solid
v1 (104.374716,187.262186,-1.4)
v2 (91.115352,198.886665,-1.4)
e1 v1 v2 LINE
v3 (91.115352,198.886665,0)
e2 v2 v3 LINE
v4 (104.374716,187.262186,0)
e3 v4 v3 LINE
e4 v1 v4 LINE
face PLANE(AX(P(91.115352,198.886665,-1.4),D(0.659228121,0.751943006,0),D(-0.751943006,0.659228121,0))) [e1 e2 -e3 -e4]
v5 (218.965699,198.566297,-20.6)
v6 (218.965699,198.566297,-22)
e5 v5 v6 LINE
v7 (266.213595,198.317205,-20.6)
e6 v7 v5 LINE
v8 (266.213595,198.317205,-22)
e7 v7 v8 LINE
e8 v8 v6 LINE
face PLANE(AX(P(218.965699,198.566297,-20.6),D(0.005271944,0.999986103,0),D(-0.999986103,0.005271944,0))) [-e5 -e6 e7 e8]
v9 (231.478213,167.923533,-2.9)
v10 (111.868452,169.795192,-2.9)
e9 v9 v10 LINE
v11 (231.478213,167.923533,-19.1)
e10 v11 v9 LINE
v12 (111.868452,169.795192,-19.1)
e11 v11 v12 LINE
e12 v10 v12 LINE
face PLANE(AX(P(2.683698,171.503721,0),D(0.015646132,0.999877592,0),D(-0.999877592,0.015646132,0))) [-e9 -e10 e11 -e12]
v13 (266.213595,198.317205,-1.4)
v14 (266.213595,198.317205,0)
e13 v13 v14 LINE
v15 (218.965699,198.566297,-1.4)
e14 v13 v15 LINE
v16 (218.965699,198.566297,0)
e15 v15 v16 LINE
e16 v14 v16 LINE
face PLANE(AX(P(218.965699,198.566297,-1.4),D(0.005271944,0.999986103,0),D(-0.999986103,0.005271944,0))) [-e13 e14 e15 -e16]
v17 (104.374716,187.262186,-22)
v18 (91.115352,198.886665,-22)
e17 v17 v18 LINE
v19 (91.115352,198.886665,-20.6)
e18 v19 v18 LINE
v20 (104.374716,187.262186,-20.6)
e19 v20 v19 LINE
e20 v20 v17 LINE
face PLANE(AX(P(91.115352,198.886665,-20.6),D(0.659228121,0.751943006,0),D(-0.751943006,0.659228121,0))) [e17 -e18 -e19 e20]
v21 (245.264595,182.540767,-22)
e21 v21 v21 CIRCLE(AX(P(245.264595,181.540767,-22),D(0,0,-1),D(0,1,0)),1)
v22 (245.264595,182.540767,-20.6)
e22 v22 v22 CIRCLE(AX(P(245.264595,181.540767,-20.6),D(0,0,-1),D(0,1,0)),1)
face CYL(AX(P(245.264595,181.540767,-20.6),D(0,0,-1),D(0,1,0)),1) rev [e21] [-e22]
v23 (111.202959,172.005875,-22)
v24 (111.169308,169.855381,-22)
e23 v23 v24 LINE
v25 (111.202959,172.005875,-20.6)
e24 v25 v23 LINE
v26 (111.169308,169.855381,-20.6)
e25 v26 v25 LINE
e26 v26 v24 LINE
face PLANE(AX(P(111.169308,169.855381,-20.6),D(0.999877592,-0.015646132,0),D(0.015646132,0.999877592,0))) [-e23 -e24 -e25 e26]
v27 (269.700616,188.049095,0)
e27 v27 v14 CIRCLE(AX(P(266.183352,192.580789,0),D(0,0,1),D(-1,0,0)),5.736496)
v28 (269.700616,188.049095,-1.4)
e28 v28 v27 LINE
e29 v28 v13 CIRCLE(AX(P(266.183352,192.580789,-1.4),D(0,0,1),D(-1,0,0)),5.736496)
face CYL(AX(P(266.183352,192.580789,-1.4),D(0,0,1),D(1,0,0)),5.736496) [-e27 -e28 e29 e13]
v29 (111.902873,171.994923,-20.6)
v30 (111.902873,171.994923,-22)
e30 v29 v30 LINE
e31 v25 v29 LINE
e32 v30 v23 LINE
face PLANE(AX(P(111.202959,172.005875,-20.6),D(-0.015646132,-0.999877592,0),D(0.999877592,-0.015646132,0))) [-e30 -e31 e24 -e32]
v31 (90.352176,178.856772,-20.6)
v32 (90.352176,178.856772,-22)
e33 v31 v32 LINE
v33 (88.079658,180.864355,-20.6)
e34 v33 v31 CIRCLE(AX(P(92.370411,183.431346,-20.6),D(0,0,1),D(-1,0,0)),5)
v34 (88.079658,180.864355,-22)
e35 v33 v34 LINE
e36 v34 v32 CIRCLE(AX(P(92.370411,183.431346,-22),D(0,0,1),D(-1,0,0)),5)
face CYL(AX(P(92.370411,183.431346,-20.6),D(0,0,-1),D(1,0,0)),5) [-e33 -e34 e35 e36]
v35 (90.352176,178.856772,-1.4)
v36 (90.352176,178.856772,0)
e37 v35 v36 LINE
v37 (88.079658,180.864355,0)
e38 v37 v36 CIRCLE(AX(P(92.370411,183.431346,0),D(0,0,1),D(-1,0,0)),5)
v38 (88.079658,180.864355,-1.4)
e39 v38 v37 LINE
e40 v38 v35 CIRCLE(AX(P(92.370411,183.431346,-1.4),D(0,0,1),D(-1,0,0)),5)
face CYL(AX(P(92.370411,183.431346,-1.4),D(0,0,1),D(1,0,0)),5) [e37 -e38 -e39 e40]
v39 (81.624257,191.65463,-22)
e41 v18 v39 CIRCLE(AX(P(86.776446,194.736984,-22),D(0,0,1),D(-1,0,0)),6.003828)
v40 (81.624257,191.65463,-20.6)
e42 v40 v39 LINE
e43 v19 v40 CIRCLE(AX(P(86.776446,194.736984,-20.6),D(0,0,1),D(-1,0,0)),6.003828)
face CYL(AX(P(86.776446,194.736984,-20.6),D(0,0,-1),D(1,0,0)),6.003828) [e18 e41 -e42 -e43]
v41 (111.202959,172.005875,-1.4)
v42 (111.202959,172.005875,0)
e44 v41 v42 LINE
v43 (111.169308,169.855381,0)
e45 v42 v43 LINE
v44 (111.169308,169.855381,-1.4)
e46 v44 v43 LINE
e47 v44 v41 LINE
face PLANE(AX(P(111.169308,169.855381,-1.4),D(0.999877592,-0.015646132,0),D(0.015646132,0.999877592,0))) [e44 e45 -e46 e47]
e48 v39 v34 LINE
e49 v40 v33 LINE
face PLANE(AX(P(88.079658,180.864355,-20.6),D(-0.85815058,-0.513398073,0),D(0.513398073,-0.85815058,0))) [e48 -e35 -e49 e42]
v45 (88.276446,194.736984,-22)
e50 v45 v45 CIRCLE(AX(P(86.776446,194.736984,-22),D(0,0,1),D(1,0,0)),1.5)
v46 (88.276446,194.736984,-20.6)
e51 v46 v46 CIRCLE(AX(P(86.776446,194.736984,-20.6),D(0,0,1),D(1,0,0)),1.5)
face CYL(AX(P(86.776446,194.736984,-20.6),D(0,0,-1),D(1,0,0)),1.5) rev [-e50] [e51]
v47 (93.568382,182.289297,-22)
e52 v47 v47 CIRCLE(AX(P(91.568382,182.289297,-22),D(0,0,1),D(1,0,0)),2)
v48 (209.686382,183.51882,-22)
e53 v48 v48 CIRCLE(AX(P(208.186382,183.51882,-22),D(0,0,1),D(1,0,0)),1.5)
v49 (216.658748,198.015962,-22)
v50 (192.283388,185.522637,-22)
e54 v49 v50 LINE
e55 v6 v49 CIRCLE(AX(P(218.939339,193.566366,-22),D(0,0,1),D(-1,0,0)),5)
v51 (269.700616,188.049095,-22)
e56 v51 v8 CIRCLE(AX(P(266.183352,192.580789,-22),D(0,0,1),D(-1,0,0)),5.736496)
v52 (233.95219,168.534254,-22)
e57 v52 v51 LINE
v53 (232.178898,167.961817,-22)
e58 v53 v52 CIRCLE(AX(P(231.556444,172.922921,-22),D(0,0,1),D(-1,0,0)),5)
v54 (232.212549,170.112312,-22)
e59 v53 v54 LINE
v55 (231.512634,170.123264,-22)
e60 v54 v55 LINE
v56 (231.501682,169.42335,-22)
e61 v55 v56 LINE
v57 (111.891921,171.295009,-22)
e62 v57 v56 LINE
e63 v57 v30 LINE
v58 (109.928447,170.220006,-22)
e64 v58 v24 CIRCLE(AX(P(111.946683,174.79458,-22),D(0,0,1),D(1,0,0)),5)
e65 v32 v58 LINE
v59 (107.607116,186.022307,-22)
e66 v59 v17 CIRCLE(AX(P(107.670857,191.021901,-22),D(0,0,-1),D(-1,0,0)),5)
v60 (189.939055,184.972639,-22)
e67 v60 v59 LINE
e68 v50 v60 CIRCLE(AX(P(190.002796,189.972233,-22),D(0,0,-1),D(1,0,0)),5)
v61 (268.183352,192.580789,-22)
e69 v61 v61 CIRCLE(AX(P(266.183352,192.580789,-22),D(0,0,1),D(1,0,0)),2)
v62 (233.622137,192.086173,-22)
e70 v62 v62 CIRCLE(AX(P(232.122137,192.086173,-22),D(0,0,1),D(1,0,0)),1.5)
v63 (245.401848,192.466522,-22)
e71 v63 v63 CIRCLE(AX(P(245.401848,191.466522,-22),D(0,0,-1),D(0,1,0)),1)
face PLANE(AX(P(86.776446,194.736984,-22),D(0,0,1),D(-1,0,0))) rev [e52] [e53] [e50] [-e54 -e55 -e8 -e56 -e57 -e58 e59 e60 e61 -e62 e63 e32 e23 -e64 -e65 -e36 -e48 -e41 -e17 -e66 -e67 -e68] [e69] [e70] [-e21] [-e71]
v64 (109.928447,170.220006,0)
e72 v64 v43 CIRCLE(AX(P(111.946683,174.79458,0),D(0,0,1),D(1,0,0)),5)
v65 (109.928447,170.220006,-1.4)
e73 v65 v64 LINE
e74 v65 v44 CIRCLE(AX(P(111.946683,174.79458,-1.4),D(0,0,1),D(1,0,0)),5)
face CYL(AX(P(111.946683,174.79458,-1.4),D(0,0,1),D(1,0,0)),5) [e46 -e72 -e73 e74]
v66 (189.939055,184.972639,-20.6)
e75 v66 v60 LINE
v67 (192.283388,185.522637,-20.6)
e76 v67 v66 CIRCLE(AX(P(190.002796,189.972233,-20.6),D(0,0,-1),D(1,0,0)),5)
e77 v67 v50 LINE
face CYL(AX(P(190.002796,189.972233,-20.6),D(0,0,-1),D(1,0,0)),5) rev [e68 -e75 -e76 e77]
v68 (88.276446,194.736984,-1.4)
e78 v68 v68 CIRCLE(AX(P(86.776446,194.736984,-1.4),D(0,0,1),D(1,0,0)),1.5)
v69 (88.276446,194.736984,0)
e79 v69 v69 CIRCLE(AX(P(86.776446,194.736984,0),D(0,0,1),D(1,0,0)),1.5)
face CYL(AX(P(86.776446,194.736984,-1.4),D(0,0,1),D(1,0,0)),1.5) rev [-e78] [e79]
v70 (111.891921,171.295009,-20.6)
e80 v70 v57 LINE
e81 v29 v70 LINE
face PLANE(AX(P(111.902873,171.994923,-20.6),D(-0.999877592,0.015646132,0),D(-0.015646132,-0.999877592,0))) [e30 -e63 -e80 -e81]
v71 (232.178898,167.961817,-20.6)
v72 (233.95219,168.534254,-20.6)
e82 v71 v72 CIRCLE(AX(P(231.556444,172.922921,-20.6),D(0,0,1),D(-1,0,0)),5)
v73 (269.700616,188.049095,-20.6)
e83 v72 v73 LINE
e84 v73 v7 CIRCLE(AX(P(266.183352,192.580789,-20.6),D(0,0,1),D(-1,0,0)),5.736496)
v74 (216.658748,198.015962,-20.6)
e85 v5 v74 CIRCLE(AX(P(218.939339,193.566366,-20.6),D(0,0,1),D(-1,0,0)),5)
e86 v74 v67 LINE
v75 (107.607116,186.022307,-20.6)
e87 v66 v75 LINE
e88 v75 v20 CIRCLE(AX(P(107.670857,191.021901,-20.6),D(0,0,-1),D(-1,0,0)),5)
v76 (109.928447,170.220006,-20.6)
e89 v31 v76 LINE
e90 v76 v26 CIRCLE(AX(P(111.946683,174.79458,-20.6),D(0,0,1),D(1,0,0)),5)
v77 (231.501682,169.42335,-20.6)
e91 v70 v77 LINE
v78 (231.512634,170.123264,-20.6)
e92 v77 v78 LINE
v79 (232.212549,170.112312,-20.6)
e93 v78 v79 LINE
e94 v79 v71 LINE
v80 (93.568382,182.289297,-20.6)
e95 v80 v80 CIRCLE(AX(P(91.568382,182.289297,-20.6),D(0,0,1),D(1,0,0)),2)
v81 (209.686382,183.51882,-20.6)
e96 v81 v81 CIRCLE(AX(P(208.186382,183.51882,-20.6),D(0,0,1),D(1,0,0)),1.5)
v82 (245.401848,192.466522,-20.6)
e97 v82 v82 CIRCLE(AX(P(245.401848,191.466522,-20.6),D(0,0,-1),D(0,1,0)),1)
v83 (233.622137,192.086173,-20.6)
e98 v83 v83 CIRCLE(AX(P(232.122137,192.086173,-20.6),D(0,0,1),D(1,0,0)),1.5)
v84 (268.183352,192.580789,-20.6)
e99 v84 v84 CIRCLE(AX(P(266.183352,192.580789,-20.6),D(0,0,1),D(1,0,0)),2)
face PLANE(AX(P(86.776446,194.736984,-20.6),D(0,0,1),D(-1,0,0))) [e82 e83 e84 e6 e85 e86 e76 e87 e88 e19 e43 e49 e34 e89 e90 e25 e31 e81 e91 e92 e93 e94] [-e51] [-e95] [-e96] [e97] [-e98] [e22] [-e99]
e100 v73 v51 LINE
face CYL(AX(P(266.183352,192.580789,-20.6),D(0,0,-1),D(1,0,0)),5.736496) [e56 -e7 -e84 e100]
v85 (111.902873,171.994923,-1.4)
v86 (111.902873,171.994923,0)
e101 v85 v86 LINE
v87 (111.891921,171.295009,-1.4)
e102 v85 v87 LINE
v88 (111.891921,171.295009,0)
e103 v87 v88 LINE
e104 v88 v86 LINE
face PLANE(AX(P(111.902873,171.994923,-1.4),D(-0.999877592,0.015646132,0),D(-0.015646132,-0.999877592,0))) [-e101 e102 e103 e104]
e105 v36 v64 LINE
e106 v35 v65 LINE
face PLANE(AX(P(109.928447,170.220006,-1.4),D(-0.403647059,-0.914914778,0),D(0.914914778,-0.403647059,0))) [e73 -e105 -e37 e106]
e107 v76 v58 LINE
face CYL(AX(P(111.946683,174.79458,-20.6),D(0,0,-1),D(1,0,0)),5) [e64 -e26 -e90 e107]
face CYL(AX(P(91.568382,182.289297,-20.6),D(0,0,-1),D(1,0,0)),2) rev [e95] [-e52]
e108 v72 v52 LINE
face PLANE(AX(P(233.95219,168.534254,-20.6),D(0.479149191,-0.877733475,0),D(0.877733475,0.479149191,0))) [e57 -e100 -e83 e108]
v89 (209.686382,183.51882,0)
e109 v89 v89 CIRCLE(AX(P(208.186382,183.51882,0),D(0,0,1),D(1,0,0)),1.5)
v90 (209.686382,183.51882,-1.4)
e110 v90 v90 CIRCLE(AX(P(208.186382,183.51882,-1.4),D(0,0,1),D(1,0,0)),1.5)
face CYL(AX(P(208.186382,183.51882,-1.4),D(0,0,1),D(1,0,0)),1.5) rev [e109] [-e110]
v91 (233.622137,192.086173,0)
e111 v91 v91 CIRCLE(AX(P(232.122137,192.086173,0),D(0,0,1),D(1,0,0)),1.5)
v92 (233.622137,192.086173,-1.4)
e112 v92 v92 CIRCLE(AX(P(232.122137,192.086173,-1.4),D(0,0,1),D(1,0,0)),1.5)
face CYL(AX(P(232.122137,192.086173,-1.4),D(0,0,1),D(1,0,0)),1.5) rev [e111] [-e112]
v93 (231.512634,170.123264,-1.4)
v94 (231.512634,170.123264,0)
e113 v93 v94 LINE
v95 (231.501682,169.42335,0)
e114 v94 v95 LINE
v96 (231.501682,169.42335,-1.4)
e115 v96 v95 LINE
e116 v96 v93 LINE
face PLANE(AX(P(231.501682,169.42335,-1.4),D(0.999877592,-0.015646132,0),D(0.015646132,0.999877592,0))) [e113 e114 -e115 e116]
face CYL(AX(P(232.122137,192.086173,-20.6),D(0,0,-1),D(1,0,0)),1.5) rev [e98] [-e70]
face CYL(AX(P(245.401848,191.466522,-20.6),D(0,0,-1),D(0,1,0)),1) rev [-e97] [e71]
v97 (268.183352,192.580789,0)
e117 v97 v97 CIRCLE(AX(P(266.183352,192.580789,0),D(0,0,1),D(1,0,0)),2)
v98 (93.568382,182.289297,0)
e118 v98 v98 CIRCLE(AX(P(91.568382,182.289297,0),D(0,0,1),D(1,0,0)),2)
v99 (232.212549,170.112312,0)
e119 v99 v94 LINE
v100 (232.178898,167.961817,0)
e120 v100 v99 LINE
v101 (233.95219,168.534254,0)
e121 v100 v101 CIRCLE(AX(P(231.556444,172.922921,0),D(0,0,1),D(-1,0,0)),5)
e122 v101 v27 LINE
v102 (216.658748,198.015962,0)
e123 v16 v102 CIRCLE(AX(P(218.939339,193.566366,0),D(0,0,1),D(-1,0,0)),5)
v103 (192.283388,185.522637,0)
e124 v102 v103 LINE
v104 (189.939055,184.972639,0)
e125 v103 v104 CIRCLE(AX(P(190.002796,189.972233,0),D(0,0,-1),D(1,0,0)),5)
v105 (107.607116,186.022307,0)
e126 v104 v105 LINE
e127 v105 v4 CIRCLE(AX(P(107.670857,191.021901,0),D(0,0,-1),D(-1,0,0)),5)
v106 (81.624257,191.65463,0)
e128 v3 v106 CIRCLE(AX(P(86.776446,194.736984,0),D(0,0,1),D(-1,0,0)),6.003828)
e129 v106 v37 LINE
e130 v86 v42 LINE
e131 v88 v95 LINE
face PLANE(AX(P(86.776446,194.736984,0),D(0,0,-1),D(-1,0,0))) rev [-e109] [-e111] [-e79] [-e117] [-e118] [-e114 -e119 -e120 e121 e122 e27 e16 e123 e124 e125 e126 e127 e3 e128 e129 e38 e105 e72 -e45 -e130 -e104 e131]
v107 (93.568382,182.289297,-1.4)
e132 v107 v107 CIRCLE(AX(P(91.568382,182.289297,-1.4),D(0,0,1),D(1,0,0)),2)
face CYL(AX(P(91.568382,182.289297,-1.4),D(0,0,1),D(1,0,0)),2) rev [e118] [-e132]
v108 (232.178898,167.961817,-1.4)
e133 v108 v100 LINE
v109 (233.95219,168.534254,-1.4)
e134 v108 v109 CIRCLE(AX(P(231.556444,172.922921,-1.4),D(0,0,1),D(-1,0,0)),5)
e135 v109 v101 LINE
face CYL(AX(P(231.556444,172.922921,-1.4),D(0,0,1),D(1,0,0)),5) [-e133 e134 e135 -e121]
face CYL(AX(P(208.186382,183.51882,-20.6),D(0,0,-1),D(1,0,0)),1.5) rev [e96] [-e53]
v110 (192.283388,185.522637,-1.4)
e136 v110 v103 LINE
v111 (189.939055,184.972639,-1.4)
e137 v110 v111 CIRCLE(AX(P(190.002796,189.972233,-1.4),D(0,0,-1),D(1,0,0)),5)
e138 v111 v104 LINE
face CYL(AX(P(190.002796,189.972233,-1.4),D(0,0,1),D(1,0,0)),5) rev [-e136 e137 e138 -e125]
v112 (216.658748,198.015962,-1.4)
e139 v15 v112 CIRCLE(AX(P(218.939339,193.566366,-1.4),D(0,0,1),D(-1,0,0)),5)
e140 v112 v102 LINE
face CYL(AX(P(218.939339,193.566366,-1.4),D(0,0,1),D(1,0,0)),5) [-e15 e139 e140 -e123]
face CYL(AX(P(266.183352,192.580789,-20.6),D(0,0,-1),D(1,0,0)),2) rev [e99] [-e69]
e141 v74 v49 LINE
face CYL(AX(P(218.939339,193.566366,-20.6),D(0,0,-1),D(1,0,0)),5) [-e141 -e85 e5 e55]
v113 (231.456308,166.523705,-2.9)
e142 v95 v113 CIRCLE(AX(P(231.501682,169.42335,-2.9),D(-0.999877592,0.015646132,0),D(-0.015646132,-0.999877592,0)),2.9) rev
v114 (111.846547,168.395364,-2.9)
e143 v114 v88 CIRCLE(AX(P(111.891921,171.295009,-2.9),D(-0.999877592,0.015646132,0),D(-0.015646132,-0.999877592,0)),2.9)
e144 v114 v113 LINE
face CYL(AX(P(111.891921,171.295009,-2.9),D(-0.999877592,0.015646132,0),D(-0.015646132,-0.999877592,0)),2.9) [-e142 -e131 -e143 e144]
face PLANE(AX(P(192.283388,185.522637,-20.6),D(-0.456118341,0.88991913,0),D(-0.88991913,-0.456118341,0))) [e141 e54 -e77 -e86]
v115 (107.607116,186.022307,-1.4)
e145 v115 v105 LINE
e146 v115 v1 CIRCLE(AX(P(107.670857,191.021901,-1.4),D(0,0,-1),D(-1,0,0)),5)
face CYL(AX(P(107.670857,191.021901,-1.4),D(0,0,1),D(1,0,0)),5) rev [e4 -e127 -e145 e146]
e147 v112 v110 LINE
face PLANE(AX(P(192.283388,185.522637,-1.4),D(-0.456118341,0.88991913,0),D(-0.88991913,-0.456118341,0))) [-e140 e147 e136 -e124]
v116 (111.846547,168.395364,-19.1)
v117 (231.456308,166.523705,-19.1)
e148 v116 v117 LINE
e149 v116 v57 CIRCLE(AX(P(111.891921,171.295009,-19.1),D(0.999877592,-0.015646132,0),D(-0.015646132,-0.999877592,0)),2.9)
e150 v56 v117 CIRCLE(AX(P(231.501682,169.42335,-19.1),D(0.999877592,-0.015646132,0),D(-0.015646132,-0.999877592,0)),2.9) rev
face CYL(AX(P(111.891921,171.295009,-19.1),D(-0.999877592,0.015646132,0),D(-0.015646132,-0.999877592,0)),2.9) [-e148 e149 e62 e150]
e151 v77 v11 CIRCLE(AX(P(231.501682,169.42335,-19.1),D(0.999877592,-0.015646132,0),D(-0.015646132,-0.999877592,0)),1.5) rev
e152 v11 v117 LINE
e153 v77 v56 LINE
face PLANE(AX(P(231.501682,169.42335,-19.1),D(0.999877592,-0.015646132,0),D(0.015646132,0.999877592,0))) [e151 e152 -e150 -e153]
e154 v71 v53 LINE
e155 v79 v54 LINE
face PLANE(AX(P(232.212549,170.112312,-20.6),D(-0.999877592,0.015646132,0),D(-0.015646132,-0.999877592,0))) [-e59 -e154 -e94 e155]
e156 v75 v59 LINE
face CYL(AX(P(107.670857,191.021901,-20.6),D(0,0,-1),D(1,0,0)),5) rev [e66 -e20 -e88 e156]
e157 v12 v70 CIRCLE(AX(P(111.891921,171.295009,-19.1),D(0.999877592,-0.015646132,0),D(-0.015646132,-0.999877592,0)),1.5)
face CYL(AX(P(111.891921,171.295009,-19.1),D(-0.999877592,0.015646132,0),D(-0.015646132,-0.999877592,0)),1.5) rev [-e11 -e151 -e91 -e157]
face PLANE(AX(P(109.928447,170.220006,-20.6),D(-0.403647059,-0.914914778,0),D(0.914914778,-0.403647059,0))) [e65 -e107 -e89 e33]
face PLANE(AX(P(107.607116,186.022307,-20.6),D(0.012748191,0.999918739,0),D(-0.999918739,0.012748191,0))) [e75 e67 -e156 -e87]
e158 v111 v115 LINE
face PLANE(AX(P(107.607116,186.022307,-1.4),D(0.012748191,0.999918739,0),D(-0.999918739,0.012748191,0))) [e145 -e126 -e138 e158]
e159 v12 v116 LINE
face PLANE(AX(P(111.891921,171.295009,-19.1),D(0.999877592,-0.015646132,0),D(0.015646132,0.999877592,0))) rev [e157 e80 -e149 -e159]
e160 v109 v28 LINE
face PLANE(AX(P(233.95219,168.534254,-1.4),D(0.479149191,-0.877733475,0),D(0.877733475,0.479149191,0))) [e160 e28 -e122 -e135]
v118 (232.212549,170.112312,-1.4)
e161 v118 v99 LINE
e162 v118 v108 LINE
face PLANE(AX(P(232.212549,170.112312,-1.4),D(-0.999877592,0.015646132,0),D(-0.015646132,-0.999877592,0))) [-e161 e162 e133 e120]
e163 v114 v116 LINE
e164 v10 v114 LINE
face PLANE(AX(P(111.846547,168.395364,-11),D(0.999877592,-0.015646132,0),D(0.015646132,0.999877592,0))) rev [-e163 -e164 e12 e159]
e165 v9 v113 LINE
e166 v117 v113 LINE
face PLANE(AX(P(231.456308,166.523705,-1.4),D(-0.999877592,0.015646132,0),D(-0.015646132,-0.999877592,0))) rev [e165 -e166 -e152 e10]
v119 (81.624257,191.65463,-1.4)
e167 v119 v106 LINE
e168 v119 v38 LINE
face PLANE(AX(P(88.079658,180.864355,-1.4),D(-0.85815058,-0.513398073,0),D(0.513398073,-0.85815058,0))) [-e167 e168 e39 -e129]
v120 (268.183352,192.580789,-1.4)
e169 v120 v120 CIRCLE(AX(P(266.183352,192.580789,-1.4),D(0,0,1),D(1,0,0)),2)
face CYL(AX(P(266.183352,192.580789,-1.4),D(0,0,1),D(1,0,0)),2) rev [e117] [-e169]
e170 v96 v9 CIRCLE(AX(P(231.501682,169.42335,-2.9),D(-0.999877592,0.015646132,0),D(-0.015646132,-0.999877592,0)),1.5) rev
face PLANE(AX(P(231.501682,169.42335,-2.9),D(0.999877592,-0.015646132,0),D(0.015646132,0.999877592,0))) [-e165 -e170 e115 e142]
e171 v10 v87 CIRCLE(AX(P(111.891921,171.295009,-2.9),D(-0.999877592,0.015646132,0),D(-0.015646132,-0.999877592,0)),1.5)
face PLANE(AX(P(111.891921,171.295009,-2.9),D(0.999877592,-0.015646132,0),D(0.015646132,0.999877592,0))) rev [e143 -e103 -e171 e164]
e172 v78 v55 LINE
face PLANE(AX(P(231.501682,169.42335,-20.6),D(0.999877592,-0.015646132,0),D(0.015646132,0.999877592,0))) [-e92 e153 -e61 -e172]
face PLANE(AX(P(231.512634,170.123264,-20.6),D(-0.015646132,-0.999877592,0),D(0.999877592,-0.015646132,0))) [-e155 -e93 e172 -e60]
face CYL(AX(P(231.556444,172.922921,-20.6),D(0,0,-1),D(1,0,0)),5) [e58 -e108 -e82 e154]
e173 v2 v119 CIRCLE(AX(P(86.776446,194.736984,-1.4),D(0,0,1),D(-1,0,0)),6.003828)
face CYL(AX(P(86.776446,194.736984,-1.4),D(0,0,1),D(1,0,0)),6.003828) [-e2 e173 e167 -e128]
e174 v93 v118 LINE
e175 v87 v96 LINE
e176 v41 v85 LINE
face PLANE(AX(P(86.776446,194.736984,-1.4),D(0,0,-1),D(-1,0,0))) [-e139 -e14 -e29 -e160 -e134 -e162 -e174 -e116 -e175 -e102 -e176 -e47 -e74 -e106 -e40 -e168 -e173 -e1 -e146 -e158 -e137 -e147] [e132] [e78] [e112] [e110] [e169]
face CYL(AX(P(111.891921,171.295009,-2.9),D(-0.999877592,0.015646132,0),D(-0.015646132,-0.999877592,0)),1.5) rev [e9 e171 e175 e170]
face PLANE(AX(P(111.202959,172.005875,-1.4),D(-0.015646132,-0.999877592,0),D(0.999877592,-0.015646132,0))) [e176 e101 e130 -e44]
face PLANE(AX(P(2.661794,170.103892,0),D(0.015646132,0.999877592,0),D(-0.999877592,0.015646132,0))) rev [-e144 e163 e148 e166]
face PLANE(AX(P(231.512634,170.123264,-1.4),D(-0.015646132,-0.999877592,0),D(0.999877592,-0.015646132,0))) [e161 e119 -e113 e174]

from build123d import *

# Parameters (mm, degrees)
SKETCH2_R                     = 1.5
SKETCH2_R_2                   = 2
BASE_FLANGE1_DEPTH            = 1.4
EDGE_FLANGE1_STRIP_W          = 8.6
EDGE_FLANGE1_STRIP_H          = 1.4
EDGE_FLANGE1_STRIP_CUT_DEPTH  = 119.624404155
EDGE_FLANGE1_RELIEF_W         = 9.3
EDGE_FLANGE1_RELIEF_H         = 0.7
EDGE_FLANGE1_RELIEF_CUT_DEPTH = 1.4
EDGE_FLANGE1_DEPTH            = 119.624404155
SKETCH17_R                    = 1
CUT_EXTRUDE1_DEPTH            = 1.4


# Sheet-metal steps are written as plain solids
with BuildPart() as part:
    # Sketch2 → Base-Flange1 (new body)
    with BuildSketch(Plane.XY):
        with BuildLine():
            Line((231.478213009, 167.923533188), (111.868451864, 169.7951924))
            ThreePointArc((111.868451864, 169.7951924), (110.877145651, 169.910310621), (109.928447229, 170.220006467))
            Line((109.928447229, 170.220006467), (90.352175795, 178.856771959))
            ThreePointArc((90.352175795, 178.856771959), (89.060059005, 179.68413768), (88.079658187, 180.864355486))
            Line((88.079658187, 180.864355486), (81.624256856, 191.654630499))
            ThreePointArc((81.624256856, 191.654630499), (83.137635743, 199.512444421), (91.115351923, 198.886665029))
            Line((91.115351923, 198.886665029), (104.374715918, 187.262186129))
            ThreePointArc((104.374715918, 187.262186129), (105.880179055, 186.353553036), (107.60711557, 186.022307468))
            Line((107.60711557, 186.022307468), (189.939055045, 184.972638911))
            ThreePointArc((189.939055045, 184.972638911), (191.144825453, 185.104402623), (192.283387705, 185.522636952))
            Line((192.283387705, 185.522636952), (216.658747604, 198.015961736))
            ThreePointArc((216.658747604, 198.015961736), (217.779120548, 198.429892832), (218.965699032, 198.5662966))
            Line((218.965699032, 198.5662966), (266.21359493, 198.317204861))
            ThreePointArc((266.21359493, 198.317204861), (271.61517707, 194.425420779), (269.70061588, 188.049095159))
            Line((269.70061588, 188.049095159), (233.952189626, 168.534253774))
            ThreePointArc((233.952189626, 168.534253774), (232.754760905, 168.068640994), (231.478213009, 167.923533188))
        make_face()
        with Locations((86.776445718, 194.736984451)):
            Circle(SKETCH2_R, mode=Mode.SUBTRACT)
        with Locations((91.568382251, 182.289296649)):
            Circle(SKETCH2_R_2, mode=Mode.SUBTRACT)
        with Locations((208.186382216, 183.518819995)):
            Circle(SKETCH2_R, mode=Mode.SUBTRACT)
        with Locations((232.122136742, 192.086173294)):
            Circle(SKETCH2_R, mode=Mode.SUBTRACT)
        with Locations((266.183352442, 192.580788532)):
            Circle(SKETCH2_R_2, mode=Mode.SUBTRACT)
    extrude(amount=-BASE_FLANGE1_DEPTH)

    # Edge-Flange1 strip (across the edge) → Edge-Flange1 strip cut (cut)
    with BuildSketch(Plane(origin=(231.478213009, 167.923533188, -1.4), x_dir=(0.015646131950223352, 0.9998775917856126, -3.4914813388431334e-15), z_dir=(-0.9998775917856126, 0.015646131950223352, 0))):
        with Locations((-2.8, -0.7)):
            Rectangle(EDGE_FLANGE1_STRIP_W, EDGE_FLANGE1_STRIP_H)
    extrude(amount=EDGE_FLANGE1_STRIP_CUT_DEPTH, mode=Mode.SUBTRACT)

    # Edge-Flange1 relief (on the sheet) → Edge-Flange1 relief cut (cut)
    with BuildSketch(Plane(origin=(231.501682207, 169.423349576, -1.4), x_dir=(0.015646131950223352, 0.9998775917856126, -6.982962677686267e-15), z_dir=(0, 0, -1))):
        with Locations((-3.95, 0.35)):
            Rectangle(EDGE_FLANGE1_RELIEF_W, EDGE_FLANGE1_RELIEF_H)
        with Locations((-3.95, -119.974404155)):
            Rectangle(EDGE_FLANGE1_RELIEF_W, EDGE_FLANGE1_RELIEF_H)
    extrude(amount=-EDGE_FLANGE1_RELIEF_CUT_DEPTH, mode=Mode.SUBTRACT)

    # Edge-Flange1 section (across the edge) → Edge-Flange1 (add)
    with BuildSketch(Plane(origin=(231.478213009, 167.923533188, -1.4), x_dir=(0.015646131950223352, 0.9998775917856126, -3.4914813388431334e-15), z_dir=(-0.9998775917856126, 0.015646131950223352, 0))):
        with BuildLine():
            Line((-1.4, 1.5), (-1.4, 9.6))
            Line((-1.4, 9.6), (0, 9.6))
            Line((0, 9.6), (0, 1.5))
            ThreePointArc((0, 1.5), (0.439339828, 0.439339828), (1.5, 0))
            Line((1.5, 0), (1.5, -1.4))
            ThreePointArc((1.5, -1.4), (-0.550609665, -0.550609665), (-1.4, 1.5))
        make_face()
    extrude(amount=EDGE_FLANGE1_DEPTH)

    # Mirror1: part across plane


with BuildPart() as part_1:
    add(part.part)
    add(part.part.mirror(Plane(origin=(231.456308425, 166.52370456, -11), x_dir=(1, 0, 0), z_dir=(0, 0, 1))))

    # Sketch17 → Cut-Extrude1 (cut)
    with BuildSketch(Plane(origin=(0, 0, -22), x_dir=(-1, 0, 0), z_dir=(0, 0, -1))):
        with Locations(Location((-245.401847545, 191.466522217, 0), (0, 0, 90))):
            Circle(SKETCH17_R)
        with Locations(Location((-245.26459516, 181.540767155, 0), (0, 0, 90))):
            Circle(SKETCH17_R)
    extrude(amount=-CUT_EXTRUDE1_DEPTH, mode=Mode.SUBTRACT)


solid = part_1.part
